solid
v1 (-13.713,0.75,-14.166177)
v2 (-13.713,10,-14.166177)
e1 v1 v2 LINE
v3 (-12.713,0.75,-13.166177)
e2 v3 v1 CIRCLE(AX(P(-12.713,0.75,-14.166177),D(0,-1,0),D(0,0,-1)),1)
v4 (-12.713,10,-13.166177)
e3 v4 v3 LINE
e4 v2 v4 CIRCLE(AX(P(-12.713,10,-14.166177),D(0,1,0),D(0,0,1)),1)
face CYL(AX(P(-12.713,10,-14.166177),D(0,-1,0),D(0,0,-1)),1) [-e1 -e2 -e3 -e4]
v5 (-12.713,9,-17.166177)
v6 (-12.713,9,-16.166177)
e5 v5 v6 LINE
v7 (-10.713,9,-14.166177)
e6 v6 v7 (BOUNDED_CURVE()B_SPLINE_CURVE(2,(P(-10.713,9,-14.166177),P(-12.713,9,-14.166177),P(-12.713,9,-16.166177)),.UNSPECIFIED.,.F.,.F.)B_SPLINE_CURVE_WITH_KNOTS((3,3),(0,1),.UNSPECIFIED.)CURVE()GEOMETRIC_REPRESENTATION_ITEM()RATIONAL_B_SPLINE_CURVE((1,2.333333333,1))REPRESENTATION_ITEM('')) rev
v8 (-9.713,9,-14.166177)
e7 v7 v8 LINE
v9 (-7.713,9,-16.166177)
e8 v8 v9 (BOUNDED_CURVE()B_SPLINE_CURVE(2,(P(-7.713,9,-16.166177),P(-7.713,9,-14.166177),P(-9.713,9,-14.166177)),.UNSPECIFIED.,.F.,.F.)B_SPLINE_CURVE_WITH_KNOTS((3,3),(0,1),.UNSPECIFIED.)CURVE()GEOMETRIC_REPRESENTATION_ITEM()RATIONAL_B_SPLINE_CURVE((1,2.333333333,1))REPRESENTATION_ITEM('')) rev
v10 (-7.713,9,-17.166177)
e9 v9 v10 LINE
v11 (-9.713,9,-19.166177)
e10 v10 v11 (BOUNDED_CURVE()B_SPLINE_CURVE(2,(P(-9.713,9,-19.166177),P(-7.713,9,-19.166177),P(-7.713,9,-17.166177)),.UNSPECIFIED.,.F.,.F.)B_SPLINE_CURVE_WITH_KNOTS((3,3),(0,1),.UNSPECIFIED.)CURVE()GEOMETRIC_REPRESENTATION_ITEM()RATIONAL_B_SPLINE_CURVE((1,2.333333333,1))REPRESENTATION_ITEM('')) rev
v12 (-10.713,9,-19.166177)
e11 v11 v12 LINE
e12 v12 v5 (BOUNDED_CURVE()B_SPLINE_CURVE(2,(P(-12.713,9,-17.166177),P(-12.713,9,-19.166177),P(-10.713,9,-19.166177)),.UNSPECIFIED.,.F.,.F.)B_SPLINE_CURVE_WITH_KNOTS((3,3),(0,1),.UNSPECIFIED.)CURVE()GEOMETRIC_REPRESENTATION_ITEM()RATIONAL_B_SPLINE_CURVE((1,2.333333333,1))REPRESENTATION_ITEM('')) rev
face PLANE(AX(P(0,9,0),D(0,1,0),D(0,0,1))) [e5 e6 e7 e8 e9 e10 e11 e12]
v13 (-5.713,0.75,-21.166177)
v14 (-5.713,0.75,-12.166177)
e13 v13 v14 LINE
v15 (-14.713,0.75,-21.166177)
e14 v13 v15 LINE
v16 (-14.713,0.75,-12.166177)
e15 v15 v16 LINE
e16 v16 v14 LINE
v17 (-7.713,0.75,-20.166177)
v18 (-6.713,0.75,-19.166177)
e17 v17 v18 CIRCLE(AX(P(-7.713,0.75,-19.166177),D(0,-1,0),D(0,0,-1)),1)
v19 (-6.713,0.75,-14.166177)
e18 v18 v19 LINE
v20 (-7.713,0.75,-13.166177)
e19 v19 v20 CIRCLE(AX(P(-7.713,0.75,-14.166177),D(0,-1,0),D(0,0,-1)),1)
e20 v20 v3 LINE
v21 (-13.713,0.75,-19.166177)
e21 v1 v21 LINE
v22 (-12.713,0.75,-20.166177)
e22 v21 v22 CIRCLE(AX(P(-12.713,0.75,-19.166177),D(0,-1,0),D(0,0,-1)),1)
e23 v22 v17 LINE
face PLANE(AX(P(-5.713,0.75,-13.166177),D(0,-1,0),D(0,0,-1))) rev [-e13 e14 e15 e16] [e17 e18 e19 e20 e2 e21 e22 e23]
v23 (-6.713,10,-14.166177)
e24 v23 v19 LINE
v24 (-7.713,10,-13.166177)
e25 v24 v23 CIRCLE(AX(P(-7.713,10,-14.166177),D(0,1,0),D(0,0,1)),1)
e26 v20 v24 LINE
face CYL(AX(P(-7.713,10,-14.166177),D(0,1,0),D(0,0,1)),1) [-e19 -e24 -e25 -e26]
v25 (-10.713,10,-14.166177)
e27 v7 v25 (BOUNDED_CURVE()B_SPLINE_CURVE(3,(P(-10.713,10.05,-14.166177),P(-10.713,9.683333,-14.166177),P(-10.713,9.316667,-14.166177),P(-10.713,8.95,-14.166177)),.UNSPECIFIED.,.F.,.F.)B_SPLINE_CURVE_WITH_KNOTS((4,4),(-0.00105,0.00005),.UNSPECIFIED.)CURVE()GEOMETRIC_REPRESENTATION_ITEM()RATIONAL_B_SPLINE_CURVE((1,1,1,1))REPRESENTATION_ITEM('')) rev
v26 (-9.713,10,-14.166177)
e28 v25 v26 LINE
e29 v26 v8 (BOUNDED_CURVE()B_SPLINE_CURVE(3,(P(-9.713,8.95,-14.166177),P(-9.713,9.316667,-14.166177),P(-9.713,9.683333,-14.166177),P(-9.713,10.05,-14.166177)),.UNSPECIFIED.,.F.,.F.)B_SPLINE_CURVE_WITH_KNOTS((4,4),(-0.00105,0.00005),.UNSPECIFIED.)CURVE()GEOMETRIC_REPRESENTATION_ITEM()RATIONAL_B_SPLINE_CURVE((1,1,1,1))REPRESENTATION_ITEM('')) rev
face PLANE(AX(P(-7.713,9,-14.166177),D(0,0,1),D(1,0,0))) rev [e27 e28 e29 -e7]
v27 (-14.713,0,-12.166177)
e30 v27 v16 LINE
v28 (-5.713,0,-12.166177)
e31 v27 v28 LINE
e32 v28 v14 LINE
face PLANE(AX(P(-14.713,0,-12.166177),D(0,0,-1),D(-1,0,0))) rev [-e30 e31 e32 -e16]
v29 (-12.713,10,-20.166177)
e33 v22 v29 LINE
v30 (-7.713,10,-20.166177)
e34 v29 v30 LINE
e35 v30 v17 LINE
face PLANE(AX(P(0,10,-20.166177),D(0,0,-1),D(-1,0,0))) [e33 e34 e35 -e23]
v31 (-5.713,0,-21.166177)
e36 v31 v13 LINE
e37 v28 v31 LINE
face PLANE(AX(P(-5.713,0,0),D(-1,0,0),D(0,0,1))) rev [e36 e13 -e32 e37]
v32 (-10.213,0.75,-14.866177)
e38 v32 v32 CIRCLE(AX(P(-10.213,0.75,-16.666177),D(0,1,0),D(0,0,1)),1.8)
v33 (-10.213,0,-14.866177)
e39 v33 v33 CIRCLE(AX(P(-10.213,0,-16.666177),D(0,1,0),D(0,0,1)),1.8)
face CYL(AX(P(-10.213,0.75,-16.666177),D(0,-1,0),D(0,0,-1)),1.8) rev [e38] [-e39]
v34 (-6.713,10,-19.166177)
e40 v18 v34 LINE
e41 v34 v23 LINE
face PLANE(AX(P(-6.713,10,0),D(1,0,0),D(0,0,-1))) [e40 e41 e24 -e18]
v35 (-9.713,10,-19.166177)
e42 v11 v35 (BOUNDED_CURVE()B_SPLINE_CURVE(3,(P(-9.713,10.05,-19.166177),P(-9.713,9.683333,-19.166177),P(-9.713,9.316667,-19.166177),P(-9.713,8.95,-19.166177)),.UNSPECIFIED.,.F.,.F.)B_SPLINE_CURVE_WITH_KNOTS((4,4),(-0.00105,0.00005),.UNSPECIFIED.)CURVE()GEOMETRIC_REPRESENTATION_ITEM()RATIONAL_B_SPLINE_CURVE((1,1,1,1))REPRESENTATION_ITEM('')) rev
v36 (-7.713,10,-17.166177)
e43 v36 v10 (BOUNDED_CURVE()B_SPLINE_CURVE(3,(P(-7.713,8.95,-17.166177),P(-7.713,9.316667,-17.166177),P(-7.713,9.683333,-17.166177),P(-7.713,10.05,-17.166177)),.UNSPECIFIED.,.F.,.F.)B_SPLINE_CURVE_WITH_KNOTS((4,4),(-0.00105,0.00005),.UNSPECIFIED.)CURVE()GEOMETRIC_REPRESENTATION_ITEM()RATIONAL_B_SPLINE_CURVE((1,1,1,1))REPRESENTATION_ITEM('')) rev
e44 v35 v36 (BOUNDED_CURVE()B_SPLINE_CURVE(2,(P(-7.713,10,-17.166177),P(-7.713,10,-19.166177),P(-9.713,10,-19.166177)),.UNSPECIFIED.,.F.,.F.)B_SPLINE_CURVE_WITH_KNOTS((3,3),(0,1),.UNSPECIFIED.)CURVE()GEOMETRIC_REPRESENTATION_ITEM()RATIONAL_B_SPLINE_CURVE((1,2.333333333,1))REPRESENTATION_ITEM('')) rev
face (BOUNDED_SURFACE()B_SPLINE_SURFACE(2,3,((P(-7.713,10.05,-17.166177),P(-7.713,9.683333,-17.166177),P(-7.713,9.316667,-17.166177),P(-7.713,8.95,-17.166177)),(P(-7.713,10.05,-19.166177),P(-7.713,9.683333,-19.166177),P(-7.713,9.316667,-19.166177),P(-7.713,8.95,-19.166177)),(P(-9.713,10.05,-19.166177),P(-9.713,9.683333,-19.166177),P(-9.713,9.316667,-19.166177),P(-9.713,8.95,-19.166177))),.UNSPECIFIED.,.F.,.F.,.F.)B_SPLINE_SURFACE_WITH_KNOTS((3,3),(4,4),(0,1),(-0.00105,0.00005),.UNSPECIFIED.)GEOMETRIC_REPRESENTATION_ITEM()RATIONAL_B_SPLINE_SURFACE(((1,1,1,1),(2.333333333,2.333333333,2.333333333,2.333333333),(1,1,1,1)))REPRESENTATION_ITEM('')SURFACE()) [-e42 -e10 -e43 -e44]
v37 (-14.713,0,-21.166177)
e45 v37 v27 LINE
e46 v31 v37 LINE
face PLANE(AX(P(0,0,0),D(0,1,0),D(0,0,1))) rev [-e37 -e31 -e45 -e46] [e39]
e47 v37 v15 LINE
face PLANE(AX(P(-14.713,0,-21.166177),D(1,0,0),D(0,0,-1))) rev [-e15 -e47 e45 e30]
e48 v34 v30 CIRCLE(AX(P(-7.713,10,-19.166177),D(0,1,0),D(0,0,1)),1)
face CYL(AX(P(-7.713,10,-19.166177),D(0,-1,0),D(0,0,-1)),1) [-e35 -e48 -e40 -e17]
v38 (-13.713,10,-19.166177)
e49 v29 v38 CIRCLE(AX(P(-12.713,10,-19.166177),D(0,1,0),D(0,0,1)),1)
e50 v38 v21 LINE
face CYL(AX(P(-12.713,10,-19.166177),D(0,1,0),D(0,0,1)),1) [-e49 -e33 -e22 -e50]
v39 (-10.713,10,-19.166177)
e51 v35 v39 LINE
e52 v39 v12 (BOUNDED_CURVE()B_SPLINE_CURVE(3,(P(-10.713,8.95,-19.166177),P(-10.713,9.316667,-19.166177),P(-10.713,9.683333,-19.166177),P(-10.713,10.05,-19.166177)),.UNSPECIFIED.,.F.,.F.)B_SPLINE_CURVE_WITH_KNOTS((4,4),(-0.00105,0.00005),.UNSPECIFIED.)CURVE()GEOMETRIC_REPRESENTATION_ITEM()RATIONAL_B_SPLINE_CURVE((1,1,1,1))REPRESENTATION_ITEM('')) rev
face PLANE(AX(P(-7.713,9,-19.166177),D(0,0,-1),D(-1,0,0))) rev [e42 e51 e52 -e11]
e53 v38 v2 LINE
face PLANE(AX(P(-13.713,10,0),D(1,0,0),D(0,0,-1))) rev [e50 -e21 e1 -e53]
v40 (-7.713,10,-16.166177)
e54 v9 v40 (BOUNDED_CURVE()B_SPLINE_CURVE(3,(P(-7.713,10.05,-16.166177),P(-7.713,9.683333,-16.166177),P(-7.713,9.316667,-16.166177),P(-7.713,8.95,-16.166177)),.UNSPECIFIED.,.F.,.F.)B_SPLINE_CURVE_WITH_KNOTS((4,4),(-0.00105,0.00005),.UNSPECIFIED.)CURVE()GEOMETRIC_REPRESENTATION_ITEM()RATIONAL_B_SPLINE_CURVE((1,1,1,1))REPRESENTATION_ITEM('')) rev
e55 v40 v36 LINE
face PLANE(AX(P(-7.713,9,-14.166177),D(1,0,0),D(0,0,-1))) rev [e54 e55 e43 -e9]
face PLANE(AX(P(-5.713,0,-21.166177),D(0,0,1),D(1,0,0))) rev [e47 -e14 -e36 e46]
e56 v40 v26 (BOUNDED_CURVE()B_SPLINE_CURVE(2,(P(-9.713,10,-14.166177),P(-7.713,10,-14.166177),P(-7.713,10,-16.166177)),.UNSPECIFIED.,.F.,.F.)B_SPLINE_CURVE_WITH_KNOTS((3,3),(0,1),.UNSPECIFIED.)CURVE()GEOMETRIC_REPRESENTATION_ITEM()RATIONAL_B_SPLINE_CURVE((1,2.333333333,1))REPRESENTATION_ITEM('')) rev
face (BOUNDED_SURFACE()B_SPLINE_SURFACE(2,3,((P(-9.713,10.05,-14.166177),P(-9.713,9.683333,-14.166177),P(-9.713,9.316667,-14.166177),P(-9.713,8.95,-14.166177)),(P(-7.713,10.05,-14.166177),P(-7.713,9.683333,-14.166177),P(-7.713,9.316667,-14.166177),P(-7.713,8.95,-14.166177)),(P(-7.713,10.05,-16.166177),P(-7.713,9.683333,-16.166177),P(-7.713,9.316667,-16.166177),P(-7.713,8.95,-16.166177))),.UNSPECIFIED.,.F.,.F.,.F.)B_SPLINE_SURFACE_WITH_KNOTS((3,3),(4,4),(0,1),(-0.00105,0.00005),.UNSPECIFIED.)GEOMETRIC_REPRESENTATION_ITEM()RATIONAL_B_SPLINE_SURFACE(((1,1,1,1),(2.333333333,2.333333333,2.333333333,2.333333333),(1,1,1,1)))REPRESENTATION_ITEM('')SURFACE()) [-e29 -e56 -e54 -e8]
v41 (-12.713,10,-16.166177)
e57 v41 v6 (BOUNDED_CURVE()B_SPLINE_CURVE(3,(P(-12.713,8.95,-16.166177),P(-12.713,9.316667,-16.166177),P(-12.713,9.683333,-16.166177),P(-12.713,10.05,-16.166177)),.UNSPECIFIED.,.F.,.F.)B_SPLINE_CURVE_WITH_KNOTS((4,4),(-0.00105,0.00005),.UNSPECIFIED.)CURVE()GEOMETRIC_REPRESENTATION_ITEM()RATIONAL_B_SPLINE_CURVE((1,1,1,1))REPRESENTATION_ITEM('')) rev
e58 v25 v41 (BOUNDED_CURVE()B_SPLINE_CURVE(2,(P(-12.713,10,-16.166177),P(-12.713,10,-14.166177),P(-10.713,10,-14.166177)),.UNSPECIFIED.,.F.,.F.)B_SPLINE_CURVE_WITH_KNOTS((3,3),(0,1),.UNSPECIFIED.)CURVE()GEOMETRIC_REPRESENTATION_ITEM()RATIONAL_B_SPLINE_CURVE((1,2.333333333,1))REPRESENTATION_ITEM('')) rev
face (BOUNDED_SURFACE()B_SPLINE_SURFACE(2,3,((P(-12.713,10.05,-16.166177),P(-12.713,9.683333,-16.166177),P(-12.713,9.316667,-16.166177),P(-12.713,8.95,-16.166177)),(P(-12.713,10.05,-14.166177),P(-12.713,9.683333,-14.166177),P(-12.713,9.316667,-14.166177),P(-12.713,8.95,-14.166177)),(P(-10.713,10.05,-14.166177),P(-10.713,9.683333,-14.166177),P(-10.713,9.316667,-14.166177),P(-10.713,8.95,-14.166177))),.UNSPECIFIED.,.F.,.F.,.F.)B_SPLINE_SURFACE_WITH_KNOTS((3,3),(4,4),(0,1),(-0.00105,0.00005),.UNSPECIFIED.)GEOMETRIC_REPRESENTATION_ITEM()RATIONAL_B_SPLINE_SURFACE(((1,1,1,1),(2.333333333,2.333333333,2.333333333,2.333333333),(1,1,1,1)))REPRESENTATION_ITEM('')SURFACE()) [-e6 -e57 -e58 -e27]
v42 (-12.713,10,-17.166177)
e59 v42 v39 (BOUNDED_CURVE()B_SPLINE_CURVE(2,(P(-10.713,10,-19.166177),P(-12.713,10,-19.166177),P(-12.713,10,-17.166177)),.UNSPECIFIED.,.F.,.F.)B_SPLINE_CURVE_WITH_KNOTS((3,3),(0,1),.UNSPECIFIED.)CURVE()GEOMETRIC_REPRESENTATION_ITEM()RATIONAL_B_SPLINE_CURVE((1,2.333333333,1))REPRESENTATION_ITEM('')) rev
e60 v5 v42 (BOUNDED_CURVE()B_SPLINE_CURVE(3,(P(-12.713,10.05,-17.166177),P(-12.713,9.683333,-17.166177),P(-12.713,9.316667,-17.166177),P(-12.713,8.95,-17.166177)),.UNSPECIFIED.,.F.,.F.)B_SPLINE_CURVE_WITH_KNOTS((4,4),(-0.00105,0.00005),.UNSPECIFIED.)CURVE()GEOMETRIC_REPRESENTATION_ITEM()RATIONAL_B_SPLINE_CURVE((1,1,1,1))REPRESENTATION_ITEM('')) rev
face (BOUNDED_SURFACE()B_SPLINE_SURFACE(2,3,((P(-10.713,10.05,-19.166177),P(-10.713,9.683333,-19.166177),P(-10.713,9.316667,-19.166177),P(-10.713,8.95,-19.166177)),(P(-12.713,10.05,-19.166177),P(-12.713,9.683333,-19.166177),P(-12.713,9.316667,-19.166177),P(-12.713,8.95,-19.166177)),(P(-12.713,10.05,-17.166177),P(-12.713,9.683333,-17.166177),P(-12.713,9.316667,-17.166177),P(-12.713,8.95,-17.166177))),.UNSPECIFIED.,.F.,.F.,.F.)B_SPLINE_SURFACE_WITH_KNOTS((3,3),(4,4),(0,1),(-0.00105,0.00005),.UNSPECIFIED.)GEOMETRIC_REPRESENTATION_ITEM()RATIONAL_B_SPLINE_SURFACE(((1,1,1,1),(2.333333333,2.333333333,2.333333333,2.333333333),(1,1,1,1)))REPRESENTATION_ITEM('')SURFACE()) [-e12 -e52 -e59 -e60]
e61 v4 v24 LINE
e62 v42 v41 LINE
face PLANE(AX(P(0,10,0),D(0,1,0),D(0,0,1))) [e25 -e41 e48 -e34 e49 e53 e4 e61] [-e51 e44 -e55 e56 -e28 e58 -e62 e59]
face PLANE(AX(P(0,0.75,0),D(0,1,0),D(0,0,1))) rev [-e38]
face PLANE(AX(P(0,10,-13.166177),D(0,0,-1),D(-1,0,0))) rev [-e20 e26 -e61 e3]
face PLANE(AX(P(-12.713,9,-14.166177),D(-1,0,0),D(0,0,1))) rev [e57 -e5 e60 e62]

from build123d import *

# Parameters (mm, degrees)
SKETCH1_W           = 7
SKETCH1_H           = 7
SKETCH1_R           = 1.8
BOSS_EXTRUDE1_DEPTH = 10
SKETCH1_4_R         = 1.8
CUT_EXTRUDE1_DEPTH  = 0.75
SKETCH2_W           = 8
SKETCH2_H           = 0.75
BOSS_EXTRUDE2_DEPTH = 1
CIRPATTERN1_DEPTH   = 0.75
SKETCH4_W           = 5
SKETCH4_H           = 5
CUT_EXTRUDE2_DEPTH  = 1
FILLET1_SIZE        = 2
FILLET2_R           = 1


with BuildPart() as part:
    # Sketch1 → Boss-Extrude1 (new body)
    # profile 1 of 2: a face of its own
    with BuildSketch(Plane(origin=(0, 0, 0), x_dir=(1, 0, 0), z_dir=(0, 1, 0))):
        with Locations((-10.213000206, 16.666176773)):
            Rectangle(SKETCH1_W, SKETCH1_H)
        with Locations((-10.213000206, 16.666176773)):
            Circle(SKETCH1_R, mode=Mode.SUBTRACT)
    # profile 2 of 2: a face of its own
    with BuildSketch(Plane(origin=(0, 0, 0), x_dir=(1, 0, 0), z_dir=(0, 1, 0))):
        with Locations((-10.213000206, 16.666176773)):
            Circle(SKETCH1_R)
    extrude(amount=BOSS_EXTRUDE1_DEPTH)

    # Sketch1<4> → Cut-Extrude1 (cut)
    with BuildSketch(Plane(origin=(0, 0, 0), x_dir=(1, 0, 0), z_dir=(0, 1, 0))):
        with Locations(Location((-10.213000206, 16.666176773, 0), (0, 0, 270))):
            Circle(SKETCH1_4_R)
    extrude(amount=CUT_EXTRUDE1_DEPTH, mode=Mode.SUBTRACT)

    # Sketch2 → Boss-Extrude2 (add)
    with BuildSketch(Plane(origin=(-6.713000206, 0, 0), x_dir=(0, 0, -1), z_dir=(1, 0, 0))):
        with Locations((17.166176773, 0.375)):
            Rectangle(SKETCH2_W, SKETCH2_H)
    extrude(amount=BOSS_EXTRUDE2_DEPTH)

    # CirPattern1: read off the stored shape, not the designer's step
    # CirPattern1 outline → CirPattern1 (add)
    with BuildSketch(Plane(origin=(0, 0, 0), x_dir=(1, 0, 0), z_dir=(0, 1, 0))):
        Polygon((-6.713000206, 21.166176773), (-14.713000206, 21.166176773), (-14.713000206, 12.166176773), (-5.713000206, 12.166176773), (-5.713000206, 13.166176773), (-13.713000206, 13.166176773), (-13.713000206, 20.166176773), (-6.713000206, 20.166176773), align=None)
    extrude(amount=CIRPATTERN1_DEPTH)

    # Sketch4 → Cut-Extrude2 (cut)
    with BuildSketch(Plane(origin=(0, 10, 0), x_dir=(1, 0, 0), z_dir=(0, 1, 0))):
        with Locations((-10.213000206, 16.666176773)):
            Rectangle(SKETCH4_W, SKETCH4_H)
    extrude(amount=-CUT_EXTRUDE2_DEPTH, mode=Mode.SUBTRACT)

    # Fillet1
    # a fillet whose section is not a circle: 2 mm, written as the material it adds along each edge
    with BuildSketch(Plane(origin=(-12.713000206, 10, -19.166176773), x_dir=(0, 0, 1), z_dir=(0, -1, 0)), Plane(origin=(-7.713000206, 10, -19.166176773), x_dir=(-1, 0, 0), z_dir=(0, -1, 0)), Plane(origin=(-12.713000206, 10, -14.166176773), x_dir=(1, 0, 0), z_dir=(0, -1, 0))) as fillet1_piece_1:
        with BuildLine():
            Bezier((FILLET1_SIZE, 0), (0, 0), (0, -FILLET1_SIZE), weights=[1, 2.333333333, 1])
            Line((0, -FILLET1_SIZE), (0, 0))
            Line((0, 0), (FILLET1_SIZE, 0))
        make_face()
    extrude(amount=6)
    with BuildSketch(Plane(origin=(-7.713000206, 10, -14.166176773), x_dir=(-1, 0, 0), z_dir=(0, -1, 0))) as fillet1_piece_2:
        with BuildLine():
            Bezier((FILLET1_SIZE, 0), (0, 0), (0, FILLET1_SIZE), weights=[1, 2.333333333, 1])
            Line((0, FILLET1_SIZE), (0, 0))
            Line((0, 0), (FILLET1_SIZE, 0))
        make_face()
    extrude(amount=6)

    # Fillet2
    fillet2_edges = [part.edges().sort_by_distance(p)[0] for p in [
        (-6.713000206, 5.375, -13.166176773),
        (-13.713000206, 5.375, -13.166176773),
        (-13.713000206, 5.375, -20.166176773),
        (-6.713000206, 5.375, -20.166176773),
    ]]
    fillet(fillet2_edges, radius=FILLET2_R)


solid = part.part
